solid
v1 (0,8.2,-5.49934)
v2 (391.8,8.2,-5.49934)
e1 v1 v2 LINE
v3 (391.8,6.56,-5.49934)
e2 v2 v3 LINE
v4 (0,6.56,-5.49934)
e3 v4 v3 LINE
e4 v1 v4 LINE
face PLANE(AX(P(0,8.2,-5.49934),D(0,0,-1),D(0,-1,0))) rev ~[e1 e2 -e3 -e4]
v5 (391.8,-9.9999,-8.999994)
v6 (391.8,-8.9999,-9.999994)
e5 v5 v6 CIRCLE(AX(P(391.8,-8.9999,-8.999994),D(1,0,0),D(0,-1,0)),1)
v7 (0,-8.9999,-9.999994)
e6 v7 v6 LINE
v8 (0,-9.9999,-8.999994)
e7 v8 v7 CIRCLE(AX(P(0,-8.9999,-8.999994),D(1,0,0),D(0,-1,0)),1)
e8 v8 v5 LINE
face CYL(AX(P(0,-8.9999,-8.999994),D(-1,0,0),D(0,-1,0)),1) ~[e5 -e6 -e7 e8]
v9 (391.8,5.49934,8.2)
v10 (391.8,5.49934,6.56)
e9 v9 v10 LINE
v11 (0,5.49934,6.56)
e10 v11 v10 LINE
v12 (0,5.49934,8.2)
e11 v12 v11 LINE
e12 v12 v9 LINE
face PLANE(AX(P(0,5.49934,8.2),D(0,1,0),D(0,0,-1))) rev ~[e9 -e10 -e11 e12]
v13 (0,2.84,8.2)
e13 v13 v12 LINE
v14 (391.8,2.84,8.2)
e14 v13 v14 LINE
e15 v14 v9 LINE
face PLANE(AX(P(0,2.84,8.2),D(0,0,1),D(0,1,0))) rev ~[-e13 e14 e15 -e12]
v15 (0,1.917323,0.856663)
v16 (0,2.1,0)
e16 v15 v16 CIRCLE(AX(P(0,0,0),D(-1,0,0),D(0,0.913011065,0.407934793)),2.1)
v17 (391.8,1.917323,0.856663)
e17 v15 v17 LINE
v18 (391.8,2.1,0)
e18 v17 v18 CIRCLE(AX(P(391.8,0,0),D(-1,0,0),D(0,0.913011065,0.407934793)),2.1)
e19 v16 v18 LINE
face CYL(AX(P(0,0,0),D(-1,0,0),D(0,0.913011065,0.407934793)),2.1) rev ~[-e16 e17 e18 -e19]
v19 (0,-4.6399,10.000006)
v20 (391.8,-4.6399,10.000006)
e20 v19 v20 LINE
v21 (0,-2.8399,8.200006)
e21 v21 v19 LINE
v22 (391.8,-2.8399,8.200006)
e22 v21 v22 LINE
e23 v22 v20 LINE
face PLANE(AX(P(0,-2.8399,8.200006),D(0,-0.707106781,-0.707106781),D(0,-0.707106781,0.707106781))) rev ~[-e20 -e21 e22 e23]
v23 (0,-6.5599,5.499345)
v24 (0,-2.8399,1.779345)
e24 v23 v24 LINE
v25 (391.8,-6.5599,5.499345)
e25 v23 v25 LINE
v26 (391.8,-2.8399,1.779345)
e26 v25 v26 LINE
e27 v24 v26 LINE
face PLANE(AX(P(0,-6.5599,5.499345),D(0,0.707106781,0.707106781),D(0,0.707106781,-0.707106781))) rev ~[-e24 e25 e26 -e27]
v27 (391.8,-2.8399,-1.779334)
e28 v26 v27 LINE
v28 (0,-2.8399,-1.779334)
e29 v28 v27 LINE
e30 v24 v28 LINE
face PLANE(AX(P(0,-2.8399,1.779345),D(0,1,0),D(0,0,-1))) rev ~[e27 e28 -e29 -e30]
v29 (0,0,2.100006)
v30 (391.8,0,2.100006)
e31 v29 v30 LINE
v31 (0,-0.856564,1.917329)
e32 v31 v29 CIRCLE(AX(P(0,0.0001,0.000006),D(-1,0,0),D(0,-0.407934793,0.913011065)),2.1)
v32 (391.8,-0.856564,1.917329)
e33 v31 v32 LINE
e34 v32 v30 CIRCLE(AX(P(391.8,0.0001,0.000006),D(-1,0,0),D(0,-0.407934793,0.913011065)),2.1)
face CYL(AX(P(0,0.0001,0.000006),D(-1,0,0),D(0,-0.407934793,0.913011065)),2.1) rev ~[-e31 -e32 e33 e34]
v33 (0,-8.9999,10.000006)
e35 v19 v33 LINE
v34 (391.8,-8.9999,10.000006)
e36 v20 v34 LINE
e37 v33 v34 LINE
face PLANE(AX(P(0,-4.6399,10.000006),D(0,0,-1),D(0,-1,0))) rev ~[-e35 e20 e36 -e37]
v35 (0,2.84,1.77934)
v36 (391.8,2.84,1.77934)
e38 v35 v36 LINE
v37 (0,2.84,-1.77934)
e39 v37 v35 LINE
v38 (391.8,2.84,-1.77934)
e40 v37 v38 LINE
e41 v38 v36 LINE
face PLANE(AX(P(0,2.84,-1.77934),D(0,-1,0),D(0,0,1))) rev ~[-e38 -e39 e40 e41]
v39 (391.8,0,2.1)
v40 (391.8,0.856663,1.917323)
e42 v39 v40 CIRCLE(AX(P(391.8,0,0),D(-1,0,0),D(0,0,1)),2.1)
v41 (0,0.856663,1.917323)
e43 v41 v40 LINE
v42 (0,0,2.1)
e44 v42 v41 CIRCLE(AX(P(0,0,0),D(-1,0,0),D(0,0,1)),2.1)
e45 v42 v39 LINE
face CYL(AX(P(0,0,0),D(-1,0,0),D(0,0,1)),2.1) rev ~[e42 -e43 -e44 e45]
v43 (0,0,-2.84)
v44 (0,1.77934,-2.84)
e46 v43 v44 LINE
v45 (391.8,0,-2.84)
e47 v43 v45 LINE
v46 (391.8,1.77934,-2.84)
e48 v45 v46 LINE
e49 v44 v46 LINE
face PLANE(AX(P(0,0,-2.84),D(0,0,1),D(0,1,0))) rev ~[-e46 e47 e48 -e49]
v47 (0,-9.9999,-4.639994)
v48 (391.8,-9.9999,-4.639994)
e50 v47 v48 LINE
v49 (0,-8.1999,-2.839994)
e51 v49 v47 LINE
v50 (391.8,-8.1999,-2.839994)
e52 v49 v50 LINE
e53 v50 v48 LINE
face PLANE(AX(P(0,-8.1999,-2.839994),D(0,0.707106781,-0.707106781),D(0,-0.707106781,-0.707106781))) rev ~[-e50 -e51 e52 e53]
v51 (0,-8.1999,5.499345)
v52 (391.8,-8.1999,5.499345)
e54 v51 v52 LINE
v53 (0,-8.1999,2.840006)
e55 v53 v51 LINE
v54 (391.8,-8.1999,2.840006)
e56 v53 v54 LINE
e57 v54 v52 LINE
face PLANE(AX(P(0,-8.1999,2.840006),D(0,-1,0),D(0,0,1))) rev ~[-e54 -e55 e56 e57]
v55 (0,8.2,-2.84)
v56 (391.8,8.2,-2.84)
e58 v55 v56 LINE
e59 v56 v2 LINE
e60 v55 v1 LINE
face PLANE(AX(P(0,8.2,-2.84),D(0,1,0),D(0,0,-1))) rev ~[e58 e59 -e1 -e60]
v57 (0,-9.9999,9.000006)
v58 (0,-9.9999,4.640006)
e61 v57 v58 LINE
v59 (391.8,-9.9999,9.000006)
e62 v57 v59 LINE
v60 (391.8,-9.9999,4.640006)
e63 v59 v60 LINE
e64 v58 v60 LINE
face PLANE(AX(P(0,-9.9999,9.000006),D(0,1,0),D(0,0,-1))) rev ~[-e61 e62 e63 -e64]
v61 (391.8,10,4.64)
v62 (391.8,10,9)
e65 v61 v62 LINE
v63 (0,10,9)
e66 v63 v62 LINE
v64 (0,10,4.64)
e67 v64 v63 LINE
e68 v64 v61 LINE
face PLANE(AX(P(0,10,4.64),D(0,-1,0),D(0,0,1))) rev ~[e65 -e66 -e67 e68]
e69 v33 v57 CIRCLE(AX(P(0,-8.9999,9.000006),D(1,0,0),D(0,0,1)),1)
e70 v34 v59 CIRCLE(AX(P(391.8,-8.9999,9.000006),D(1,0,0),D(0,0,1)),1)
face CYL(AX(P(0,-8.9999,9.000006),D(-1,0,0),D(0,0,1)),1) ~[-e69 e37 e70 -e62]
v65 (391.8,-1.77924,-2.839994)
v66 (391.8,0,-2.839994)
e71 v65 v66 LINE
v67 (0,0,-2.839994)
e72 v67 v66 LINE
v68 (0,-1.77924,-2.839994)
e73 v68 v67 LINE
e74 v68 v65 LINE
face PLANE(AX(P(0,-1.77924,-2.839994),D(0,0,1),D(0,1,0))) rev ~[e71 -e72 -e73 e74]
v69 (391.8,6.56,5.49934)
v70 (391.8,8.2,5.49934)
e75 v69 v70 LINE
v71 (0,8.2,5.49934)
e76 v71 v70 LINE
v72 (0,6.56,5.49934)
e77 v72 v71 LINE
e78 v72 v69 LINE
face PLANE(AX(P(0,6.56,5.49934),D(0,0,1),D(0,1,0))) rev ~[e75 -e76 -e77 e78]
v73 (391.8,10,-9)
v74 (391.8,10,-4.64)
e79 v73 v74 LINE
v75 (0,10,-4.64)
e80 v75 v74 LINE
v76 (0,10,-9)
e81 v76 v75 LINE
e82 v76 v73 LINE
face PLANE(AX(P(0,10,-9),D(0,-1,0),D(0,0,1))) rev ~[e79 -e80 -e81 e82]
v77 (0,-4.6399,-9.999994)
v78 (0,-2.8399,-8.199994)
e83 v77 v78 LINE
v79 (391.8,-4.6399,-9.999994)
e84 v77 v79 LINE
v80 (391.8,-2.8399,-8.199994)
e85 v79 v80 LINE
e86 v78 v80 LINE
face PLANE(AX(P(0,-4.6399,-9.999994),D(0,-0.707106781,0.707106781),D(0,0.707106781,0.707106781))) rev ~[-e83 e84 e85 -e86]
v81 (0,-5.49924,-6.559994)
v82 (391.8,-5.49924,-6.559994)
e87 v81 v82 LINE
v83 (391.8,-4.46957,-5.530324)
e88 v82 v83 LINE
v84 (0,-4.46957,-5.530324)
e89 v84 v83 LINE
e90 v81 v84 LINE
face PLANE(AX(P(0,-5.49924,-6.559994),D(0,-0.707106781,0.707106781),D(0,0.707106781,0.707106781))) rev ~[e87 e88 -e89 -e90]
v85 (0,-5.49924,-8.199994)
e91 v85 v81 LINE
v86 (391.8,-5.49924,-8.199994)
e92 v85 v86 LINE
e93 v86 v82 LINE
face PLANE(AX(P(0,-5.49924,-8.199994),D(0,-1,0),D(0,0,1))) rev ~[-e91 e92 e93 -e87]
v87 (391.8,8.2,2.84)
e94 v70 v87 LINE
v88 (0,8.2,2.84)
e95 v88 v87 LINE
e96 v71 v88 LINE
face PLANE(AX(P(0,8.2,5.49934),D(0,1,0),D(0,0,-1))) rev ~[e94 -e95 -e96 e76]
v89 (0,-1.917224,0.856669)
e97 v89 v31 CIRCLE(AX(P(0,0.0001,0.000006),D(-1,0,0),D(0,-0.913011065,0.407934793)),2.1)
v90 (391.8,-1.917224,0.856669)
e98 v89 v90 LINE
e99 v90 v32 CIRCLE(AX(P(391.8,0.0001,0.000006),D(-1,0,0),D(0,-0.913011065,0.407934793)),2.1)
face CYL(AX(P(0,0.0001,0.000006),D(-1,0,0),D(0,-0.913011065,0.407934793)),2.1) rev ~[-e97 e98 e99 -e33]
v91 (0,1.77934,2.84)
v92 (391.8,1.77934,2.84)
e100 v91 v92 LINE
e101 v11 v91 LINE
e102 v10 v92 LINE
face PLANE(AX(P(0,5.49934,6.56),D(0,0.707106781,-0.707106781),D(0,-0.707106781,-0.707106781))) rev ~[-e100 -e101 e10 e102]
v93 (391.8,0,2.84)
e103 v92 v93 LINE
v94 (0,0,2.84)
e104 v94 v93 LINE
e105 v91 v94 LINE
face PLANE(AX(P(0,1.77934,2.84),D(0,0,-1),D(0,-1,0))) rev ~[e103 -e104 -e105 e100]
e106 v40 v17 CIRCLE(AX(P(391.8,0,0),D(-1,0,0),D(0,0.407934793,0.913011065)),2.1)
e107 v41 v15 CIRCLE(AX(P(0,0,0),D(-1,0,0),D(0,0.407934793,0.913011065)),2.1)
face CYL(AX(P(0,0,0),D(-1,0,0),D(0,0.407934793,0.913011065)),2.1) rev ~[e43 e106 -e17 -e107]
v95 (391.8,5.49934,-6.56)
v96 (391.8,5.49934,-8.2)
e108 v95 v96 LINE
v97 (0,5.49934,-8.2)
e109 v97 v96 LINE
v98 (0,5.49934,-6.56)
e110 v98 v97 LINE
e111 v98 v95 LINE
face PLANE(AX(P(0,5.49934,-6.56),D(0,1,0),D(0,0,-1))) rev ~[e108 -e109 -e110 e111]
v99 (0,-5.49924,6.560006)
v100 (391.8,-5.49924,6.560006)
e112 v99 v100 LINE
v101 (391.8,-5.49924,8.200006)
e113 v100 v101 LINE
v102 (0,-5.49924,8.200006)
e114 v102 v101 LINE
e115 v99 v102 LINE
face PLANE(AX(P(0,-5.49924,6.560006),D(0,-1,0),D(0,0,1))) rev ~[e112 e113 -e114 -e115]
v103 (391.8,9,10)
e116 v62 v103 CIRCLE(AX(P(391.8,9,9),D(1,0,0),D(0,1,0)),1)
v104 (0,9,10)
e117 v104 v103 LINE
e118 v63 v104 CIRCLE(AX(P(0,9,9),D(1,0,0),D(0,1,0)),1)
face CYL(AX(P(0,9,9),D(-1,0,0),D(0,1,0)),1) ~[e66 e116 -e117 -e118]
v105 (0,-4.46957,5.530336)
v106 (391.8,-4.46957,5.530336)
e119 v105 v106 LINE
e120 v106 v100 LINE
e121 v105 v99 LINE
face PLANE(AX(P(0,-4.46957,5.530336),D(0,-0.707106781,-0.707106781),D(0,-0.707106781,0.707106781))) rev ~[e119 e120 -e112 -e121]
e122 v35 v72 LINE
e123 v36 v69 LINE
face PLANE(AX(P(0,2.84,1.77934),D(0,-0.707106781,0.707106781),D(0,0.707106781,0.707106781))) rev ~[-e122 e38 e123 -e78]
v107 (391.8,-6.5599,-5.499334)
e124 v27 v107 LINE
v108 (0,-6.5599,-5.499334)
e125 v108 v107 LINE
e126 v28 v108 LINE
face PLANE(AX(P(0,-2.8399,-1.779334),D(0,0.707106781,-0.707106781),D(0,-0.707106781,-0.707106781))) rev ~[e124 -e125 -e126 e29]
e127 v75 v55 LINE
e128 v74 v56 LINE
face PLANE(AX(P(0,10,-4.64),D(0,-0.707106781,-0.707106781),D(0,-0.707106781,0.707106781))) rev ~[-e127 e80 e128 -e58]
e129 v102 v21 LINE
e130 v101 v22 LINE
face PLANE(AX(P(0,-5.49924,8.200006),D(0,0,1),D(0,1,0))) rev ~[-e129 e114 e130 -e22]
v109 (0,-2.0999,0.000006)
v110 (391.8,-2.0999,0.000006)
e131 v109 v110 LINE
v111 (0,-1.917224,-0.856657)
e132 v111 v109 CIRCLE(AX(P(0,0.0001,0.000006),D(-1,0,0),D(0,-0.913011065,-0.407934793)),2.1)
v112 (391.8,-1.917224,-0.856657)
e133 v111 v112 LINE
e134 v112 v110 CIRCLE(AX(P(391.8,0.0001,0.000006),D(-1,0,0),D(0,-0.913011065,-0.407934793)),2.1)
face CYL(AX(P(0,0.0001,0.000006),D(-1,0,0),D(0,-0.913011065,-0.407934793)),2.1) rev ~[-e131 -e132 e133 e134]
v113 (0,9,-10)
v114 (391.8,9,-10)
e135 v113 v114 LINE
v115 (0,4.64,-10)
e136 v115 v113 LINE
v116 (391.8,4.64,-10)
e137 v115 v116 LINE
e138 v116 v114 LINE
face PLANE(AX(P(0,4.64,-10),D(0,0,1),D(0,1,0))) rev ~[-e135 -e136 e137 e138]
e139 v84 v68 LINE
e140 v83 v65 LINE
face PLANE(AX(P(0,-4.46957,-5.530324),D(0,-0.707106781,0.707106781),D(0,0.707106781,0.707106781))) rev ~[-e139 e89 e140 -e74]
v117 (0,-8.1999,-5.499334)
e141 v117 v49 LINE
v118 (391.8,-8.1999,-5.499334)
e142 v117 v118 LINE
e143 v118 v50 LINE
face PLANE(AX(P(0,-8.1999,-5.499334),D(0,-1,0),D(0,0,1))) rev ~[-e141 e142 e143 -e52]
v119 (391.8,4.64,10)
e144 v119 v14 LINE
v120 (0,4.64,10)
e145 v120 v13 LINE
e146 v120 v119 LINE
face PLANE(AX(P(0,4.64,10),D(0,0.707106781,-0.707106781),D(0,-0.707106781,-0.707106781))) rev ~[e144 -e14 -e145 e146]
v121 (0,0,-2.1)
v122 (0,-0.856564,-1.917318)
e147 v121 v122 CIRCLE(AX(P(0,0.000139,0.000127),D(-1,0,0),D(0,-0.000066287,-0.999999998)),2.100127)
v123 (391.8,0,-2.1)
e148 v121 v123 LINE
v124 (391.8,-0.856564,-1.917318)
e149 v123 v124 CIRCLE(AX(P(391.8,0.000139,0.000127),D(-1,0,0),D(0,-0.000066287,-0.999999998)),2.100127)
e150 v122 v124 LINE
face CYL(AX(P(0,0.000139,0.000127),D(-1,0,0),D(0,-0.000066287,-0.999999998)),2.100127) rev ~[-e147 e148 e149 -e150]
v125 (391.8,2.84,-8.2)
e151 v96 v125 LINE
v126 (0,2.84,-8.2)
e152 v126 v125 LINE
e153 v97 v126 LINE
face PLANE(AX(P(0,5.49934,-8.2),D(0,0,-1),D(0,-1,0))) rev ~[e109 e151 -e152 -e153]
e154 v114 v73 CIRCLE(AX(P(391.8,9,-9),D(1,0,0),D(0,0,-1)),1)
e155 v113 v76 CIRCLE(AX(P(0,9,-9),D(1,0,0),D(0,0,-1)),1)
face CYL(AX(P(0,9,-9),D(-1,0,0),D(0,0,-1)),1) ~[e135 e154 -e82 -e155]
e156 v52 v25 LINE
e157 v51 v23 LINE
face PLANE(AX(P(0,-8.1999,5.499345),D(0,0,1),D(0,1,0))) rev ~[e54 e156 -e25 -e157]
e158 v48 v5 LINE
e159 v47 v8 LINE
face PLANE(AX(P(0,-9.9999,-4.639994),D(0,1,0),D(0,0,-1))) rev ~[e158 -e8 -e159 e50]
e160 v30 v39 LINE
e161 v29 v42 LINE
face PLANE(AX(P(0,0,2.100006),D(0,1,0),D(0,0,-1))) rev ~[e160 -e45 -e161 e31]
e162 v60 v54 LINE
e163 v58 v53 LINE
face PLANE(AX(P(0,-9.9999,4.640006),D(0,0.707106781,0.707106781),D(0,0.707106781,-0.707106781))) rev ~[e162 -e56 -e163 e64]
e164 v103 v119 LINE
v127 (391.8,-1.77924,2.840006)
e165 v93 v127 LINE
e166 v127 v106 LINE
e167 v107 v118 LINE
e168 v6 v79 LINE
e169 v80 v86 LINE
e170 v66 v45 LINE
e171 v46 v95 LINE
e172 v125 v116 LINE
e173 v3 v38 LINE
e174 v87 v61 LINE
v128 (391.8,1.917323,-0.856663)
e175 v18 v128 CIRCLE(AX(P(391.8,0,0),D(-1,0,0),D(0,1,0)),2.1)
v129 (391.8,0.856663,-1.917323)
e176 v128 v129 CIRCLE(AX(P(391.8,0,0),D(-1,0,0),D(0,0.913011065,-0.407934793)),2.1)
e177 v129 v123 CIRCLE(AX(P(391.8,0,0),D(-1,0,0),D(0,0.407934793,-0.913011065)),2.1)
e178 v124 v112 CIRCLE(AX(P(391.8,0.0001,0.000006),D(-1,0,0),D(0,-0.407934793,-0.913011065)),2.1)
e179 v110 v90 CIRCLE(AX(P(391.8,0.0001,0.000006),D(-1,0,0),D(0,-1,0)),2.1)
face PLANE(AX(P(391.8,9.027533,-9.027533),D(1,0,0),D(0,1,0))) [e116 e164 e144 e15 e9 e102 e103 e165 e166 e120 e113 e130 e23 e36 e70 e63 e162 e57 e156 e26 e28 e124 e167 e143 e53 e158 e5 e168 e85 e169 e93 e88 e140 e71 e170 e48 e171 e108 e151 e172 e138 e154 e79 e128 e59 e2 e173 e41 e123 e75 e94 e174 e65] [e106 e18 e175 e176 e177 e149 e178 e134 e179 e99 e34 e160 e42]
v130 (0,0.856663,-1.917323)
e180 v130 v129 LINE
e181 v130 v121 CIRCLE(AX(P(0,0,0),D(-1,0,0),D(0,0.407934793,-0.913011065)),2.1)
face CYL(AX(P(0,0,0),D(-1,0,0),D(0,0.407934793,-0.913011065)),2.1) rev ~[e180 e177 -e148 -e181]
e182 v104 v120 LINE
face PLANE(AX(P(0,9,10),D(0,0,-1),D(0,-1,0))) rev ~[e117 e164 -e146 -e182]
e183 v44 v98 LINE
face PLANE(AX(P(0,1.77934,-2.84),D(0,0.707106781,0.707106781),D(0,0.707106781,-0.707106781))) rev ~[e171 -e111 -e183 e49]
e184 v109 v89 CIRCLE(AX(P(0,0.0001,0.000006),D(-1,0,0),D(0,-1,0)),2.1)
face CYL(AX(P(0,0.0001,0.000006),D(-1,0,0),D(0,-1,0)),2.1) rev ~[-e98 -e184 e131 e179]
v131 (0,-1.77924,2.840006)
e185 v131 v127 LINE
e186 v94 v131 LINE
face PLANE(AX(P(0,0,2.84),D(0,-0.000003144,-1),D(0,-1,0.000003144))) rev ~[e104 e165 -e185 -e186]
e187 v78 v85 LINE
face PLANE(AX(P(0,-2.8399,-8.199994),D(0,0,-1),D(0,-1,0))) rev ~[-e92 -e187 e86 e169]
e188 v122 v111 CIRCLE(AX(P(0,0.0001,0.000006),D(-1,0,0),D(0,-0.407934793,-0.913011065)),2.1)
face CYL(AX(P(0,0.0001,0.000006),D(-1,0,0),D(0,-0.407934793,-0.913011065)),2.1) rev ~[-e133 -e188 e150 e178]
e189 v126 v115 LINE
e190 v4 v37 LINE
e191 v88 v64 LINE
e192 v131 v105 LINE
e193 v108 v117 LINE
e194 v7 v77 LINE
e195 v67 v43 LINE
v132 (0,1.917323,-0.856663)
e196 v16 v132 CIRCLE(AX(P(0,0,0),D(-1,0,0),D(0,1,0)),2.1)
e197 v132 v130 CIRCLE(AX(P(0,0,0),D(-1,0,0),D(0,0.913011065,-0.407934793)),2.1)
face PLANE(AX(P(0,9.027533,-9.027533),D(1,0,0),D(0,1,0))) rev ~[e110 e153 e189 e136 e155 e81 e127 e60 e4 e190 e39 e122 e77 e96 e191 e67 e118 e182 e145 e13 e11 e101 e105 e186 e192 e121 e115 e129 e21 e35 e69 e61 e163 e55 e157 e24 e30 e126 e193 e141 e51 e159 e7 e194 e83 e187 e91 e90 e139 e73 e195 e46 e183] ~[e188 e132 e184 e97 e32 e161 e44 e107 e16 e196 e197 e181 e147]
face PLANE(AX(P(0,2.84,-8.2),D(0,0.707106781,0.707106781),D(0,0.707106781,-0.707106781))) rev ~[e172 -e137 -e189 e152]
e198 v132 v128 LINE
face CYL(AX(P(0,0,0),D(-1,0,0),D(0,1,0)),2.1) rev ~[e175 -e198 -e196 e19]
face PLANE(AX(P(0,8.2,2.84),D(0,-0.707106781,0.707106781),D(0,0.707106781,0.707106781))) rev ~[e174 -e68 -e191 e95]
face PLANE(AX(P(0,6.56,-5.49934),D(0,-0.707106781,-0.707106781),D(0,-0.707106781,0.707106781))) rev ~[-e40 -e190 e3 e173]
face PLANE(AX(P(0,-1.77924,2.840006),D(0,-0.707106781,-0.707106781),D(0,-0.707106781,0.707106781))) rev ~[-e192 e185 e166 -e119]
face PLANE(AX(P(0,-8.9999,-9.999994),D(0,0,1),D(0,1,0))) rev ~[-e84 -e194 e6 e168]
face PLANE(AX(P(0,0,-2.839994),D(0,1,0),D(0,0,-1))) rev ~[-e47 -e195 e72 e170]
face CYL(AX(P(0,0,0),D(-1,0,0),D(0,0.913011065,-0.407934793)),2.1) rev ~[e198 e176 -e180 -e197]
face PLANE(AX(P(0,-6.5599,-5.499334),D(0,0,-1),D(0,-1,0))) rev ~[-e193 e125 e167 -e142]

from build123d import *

# Parameters (mm, degrees)
F1_DEPTH = 391.8


# Not quite as in the source:
# - ends of sketch curves that miss each other by under 0.0002 mm in the source are joined


with BuildPart() as f1:
    # F0 (on Right) → F1 (new body)
    with BuildSketch(Plane.YZ):
        with BuildLine():
            Line((8.2, -10), (9, -10))
            ThreePointArc((9, -10), (9.7071067812, -9.7071067812), (10, -9))
            Line((10, -9), (10, -8.2))
            Line((10, -8.2), (8.2, -8.2))
            Line((8.2, -8.2), (8.2, -10))
        make_face()
        Polygon((5.4993398282, -8.2), (7.1393398282, -8.2), (5.4993398282, -6.56), align=None)
        Polygon((6.56, -5.4993398282), (8.2, -7.1393398282), (8.2, -5.4993398282), align=None)
        with BuildLine():
            Line((8.2, 10), (8.2, 8.2))
            Line((8.2, 8.2), (10, 8.2))
            Line((10, 8.2), (10, 9))
            ThreePointArc((10, 9), (9.7071067812, 9.7071067812), (9, 10))
            Line((9, 10), (8.2, 10))
        make_face()
        Polygon((8.2, 7.1393398282), (6.56, 5.4993398282), (8.2, 5.4993398282), align=None)
        Polygon((5.4993398282, 8.2), (5.4993398282, 6.56), (7.1393398282, 8.2), align=None)
        with BuildLine():
            Line((-9.9999004684, 8.2000055944), (-8.1999004684, 8.2000055944))
            Line((-8.1999004684, 8.2000055944), (-8.1999004684, 10.0000055944))
            Line((-8.1999004684, 10.0000055944), (-8.9999004684, 10.0000055944))
            ThreePointArc((-8.9999004684, 10.0000055944), (-9.7070072496, 9.7071123756), (-9.9999004684, 9.0000055944))
            Line((-9.9999004684, 9.0000055944), (-9.9999004684, 8.2000055944))
        make_face()
        Polygon((-7.1392402967, 8.2000055944), (-5.4992402967, 6.5600055944), (-5.4992402967, 8.2000055944), align=None)
        Polygon((-8.1999004684, 5.4993454226), (-6.5599004684, 5.4993454226), (-8.1999004684, 7.1393454226), align=None)
        with BuildLine():
            Line((-8.1999004684, -9.9999944056), (-8.1999004684, -8.1999944056))
            Line((-8.1999004684, -8.1999944056), (-9.9999004684, -8.1999944056))
            Line((-9.9999004684, -8.1999944056), (-9.9999004684, -8.9999944056))
            ThreePointArc((-9.9999004684, -8.9999944056), (-9.7070072496, -9.7071011868), (-8.9999004684, -9.9999944056))
            Line((-8.9999004684, -9.9999944056), (-8.1999004684, -9.9999944056))
        make_face()
        Polygon((-8.1999004684, -7.1393342338), (-6.5599004684, -5.4993342338), (-8.1999004684, -5.4993342338), align=None)
        Polygon((-5.4992402967, -8.1999944056), (-5.4992402967, -6.5599944056), (-7.1392402967, -8.1999944056), align=None)
        with BuildLine():
            Line((1.9173232366, -0.8566630648), (2.84, -1.7793398282))
            Line((2.84, -1.7793398282), (2.84, 0))
            Line((2.84, 0), (2.1, 0))
            ThreePointArc((2.1, 0), (2.0538231176, -0.4379618723), (1.9173232366, -0.8566630648))
        make_face()
        with BuildLine():
            Line((0, -2.84), (1.7793398282, -2.84))
            Line((1.7793398282, -2.84), (0.8566630648, -1.9173232366))
            ThreePointArc((0.8566630648, -1.9173232366), (0.4379618723, -2.0538231176), (0, -2.1))
            Line((0, -2.1), (0, -2.84))
        make_face()
        with BuildLine():
            Line((-1.7792402967, -2.8399944056), (9.95316e-05, -2.8399944056))
            Line((9.95316e-05, -2.8399944056), (0, -2.1))
            ThreePointArc((0, -2.1), (-0.4378623408, -2.0538175232), (-0.8565635332, -1.9173176422))
            Line((-0.8565635332, -1.9173176422), (-1.7792402967, -2.8399944056))
        make_face()
        Polygon((4.64, -10), (8.2, -10), (8.2, -8.2), (7.1393398282, -8.2), (5.4993398282, -8.2), (2.84, -8.2), align=None)
        Polygon((8.2, -8.2), (10, -8.2), (10, -4.64), (8.2, -2.84), (8.2, -5.4993398282), (8.2, -7.1393398282), align=None)
        with BuildLine():
            ThreePointArc((0, 2.1), (0.4379618723, 2.0538231176), (0.8566630648, 1.9173232366))
            Line((0.8566630648, 1.9173232366), (1.7793398282, 2.84))
            Line((1.7793398282, 2.84), (0, 2.84))
            Line((0, 2.84), (0, 2.1))
        make_face()
        with BuildLine():
            Line((2.1, 0), (2.84, 0))
            Line((2.84, 0), (2.84, 1.7793398282))
            Line((2.84, 1.7793398282), (1.9173232366, 0.8566630648))
            ThreePointArc((1.9173232366, 0.8566630648), (2.0538231176, 0.4379618723), (2.1, 0))
        make_face()
        with BuildLine():
            ThreePointArc((-0.8565635332, 1.917328831), (-0.4378623408, 2.053828712), (9.95316e-05, 2.1000055944))
            Line((9.95316e-05, 2.1000055944), (0, 2.84))
            Line((0, 2.84), (-1.7792402967, 2.8400055944))
            Line((-1.7792402967, 2.8400055944), (-0.8565635332, 1.917328831))
        make_face()
        Polygon((8.2, 8.2), (8.2, 7.1393398282), (8.2, 5.4993398282), (8.2, 2.84), (10, 4.64), (10, 8.2), align=None)
        Polygon((7.1393398282, 8.2), (8.2, 8.2), (8.2, 10), (4.64, 10), (2.84, 8.2), (5.4993398282, 8.2), align=None)
        with BuildLine():
            Line((-2.8399004684, 1.7793454226), (-2.8399004684, 5.5944e-06))
            Line((-2.8399004684, 5.5944e-06), (-2.0999004684, 5.5944e-06))
            ThreePointArc((-2.0999004684, 5.5944e-06), (-2.053723586, 0.4379674667), (-1.917223705, 0.8566686592))
            Line((-1.917223705, 0.8566686592), (-2.8399004684, 1.7793454226))
        make_face()
        Polygon((-8.1999004684, 10.0000055944), (-8.1999004684, 8.2000055944), (-7.1392402967, 8.2000055944), (-5.4992402967, 8.2000055944), (-2.8399004684, 8.2000055944), (-4.6399004684, 10.0000055944), align=None)
        Polygon((-8.1999004684, 5.4993454226), (-8.1999004684, 7.1393454226), (-8.1999004684, 8.2000055944), (-9.9999004684, 8.2000055944), (-9.9999004684, 4.6400055944), (-8.1999004684, 2.8400055944), align=None)
        with BuildLine():
            Line((-2.8399004684, 5.5944e-06), (-2.8399004684, -1.7793342338))
            Line((-2.8399004684, -1.7793342338), (-1.917223705, -0.8566574704))
            ThreePointArc((-1.917223705, -0.8566574704), (-2.053723586, -0.4379562779), (-2.0999004684, 5.5944e-06))
            Line((-2.0999004684, 5.5944e-06), (-2.8399004684, 5.5944e-06))
        make_face()
        Polygon((-9.9999004684, -8.1999944056), (-8.1999004684, -8.1999944056), (-8.1999004684, -7.1393342338), (-8.1999004684, -5.4993342338), (-8.1999004684, -2.8399944056), (-9.9999004684, -4.6399944056), align=None)
        Polygon((-5.4992402967, -8.1999944056), (-7.1392402967, -8.1999944056), (-8.1999004684, -8.1999944056), (-8.1999004684, -9.9999944056), (-4.6399004684, -9.9999944056), (-2.8399004684, -8.1999944056), align=None)
        with BuildLine():
            Line((-2.8399004684, -1.7793342338), (-1.7792402967, -2.8399944056))
            Line((-1.7792402967, -2.8399944056), (-0.8565635332, -1.9173176422))
            ThreePointArc((-0.8565635332, -1.9173176422), (-1.4848247089, -1.4849186461), (-1.917223705, -0.8566574704))
            Line((-1.917223705, -0.8566574704), (-2.8399004684, -1.7793342338))
        make_face()
        Polygon((-4.4695703825, -5.5303244915), (-1.7792402967, -2.8399944056), (-2.8399004684, -1.7793342338), (-5.5302305543, -4.4696643197), (-6.5599004684, -5.4993342338), (-8.1999004684, -7.1393342338), (-8.1999004684, -8.1999944056), (-7.1392402967, -8.1999944056), (-5.4992402967, -6.5599944056), align=None)
        with BuildLine():
            Line((7.1393398282, -8.2), (8.2, -8.2))
            Line((8.2, -8.2), (8.2, -7.1393398282))
            Line((8.2, -7.1393398282), (6.56, -5.4993398282))
            Line((6.56, -5.4993398282), (5.5303300859, -4.4696699141))
            Line((5.5303300859, -4.4696699141), (2.84, -1.7793398282))
            Line((2.84, -1.7793398282), (1.9173232366, -0.8566630648))
            ThreePointArc((1.9173232366, -0.8566630648), (1.4849242405, -1.4849242405), (0.8566630648, -1.9173232366))
            Line((0.8566630648, -1.9173232366), (1.7793398282, -2.84))
            Line((1.7793398282, -2.84), (4.4696699141, -5.5303300859))
            Line((4.4696699141, -5.5303300859), (5.4993398282, -6.56))
            Line((5.4993398282, -6.56), (7.1393398282, -8.2))
        make_face()
        with BuildLine():
            Line((1.9173232366, 0.8566630648), (2.84, 1.7793398282))
            Line((2.84, 1.7793398282), (5.5303300859, 4.4696699141))
            Line((5.5303300859, 4.4696699141), (6.56, 5.4993398282))
            Line((6.56, 5.4993398282), (8.2, 7.1393398282))
            Line((8.2, 7.1393398282), (8.2, 8.2))
            Line((8.2, 8.2), (7.1393398282, 8.2))
            Line((7.1393398282, 8.2), (5.4993398282, 6.56))
            Line((5.4993398282, 6.56), (4.4696699141, 5.5303300859))
            Line((4.4696699141, 5.5303300859), (1.7793398282, 2.84))
            Line((1.7793398282, 2.84), (0.8566630648, 1.9173232366))
            ThreePointArc((0.8566630648, 1.9173232366), (1.4849242405, 1.4849242405), (1.9173232366, 0.8566630648))
        make_face()
        with BuildLine():
            Line((-5.5302305543, 4.4696755085), (-2.8399004684, 1.7793454226))
            Line((-2.8399004684, 1.7793454226), (-1.917223705, 0.8566686592))
            ThreePointArc((-1.917223705, 0.8566686592), (-1.4848247089, 1.4849298349), (-0.8565635332, 1.917328831))
            Line((-0.8565635332, 1.917328831), (-1.7792402967, 2.8400055944))
            Line((-1.7792402967, 2.8400055944), (-4.4695703825, 5.5303356803))
            Line((-4.4695703825, 5.5303356803), (-5.4992402967, 6.5600055944))
            Line((-5.4992402967, 6.5600055944), (-7.1392402967, 8.2000055944))
            Line((-7.1392402967, 8.2000055944), (-8.1999004684, 8.2000055944))
            Line((-8.1999004684, 8.2000055944), (-8.1999004684, 7.1393454226))
            Line((-8.1999004684, 7.1393454226), (-6.5599004684, 5.4993454226))
            Line((-6.5599004684, 5.4993454226), (-5.5302305543, 4.4696755085))
        make_face()
    extrude(amount=F1_DEPTH)


solid = f1.part
